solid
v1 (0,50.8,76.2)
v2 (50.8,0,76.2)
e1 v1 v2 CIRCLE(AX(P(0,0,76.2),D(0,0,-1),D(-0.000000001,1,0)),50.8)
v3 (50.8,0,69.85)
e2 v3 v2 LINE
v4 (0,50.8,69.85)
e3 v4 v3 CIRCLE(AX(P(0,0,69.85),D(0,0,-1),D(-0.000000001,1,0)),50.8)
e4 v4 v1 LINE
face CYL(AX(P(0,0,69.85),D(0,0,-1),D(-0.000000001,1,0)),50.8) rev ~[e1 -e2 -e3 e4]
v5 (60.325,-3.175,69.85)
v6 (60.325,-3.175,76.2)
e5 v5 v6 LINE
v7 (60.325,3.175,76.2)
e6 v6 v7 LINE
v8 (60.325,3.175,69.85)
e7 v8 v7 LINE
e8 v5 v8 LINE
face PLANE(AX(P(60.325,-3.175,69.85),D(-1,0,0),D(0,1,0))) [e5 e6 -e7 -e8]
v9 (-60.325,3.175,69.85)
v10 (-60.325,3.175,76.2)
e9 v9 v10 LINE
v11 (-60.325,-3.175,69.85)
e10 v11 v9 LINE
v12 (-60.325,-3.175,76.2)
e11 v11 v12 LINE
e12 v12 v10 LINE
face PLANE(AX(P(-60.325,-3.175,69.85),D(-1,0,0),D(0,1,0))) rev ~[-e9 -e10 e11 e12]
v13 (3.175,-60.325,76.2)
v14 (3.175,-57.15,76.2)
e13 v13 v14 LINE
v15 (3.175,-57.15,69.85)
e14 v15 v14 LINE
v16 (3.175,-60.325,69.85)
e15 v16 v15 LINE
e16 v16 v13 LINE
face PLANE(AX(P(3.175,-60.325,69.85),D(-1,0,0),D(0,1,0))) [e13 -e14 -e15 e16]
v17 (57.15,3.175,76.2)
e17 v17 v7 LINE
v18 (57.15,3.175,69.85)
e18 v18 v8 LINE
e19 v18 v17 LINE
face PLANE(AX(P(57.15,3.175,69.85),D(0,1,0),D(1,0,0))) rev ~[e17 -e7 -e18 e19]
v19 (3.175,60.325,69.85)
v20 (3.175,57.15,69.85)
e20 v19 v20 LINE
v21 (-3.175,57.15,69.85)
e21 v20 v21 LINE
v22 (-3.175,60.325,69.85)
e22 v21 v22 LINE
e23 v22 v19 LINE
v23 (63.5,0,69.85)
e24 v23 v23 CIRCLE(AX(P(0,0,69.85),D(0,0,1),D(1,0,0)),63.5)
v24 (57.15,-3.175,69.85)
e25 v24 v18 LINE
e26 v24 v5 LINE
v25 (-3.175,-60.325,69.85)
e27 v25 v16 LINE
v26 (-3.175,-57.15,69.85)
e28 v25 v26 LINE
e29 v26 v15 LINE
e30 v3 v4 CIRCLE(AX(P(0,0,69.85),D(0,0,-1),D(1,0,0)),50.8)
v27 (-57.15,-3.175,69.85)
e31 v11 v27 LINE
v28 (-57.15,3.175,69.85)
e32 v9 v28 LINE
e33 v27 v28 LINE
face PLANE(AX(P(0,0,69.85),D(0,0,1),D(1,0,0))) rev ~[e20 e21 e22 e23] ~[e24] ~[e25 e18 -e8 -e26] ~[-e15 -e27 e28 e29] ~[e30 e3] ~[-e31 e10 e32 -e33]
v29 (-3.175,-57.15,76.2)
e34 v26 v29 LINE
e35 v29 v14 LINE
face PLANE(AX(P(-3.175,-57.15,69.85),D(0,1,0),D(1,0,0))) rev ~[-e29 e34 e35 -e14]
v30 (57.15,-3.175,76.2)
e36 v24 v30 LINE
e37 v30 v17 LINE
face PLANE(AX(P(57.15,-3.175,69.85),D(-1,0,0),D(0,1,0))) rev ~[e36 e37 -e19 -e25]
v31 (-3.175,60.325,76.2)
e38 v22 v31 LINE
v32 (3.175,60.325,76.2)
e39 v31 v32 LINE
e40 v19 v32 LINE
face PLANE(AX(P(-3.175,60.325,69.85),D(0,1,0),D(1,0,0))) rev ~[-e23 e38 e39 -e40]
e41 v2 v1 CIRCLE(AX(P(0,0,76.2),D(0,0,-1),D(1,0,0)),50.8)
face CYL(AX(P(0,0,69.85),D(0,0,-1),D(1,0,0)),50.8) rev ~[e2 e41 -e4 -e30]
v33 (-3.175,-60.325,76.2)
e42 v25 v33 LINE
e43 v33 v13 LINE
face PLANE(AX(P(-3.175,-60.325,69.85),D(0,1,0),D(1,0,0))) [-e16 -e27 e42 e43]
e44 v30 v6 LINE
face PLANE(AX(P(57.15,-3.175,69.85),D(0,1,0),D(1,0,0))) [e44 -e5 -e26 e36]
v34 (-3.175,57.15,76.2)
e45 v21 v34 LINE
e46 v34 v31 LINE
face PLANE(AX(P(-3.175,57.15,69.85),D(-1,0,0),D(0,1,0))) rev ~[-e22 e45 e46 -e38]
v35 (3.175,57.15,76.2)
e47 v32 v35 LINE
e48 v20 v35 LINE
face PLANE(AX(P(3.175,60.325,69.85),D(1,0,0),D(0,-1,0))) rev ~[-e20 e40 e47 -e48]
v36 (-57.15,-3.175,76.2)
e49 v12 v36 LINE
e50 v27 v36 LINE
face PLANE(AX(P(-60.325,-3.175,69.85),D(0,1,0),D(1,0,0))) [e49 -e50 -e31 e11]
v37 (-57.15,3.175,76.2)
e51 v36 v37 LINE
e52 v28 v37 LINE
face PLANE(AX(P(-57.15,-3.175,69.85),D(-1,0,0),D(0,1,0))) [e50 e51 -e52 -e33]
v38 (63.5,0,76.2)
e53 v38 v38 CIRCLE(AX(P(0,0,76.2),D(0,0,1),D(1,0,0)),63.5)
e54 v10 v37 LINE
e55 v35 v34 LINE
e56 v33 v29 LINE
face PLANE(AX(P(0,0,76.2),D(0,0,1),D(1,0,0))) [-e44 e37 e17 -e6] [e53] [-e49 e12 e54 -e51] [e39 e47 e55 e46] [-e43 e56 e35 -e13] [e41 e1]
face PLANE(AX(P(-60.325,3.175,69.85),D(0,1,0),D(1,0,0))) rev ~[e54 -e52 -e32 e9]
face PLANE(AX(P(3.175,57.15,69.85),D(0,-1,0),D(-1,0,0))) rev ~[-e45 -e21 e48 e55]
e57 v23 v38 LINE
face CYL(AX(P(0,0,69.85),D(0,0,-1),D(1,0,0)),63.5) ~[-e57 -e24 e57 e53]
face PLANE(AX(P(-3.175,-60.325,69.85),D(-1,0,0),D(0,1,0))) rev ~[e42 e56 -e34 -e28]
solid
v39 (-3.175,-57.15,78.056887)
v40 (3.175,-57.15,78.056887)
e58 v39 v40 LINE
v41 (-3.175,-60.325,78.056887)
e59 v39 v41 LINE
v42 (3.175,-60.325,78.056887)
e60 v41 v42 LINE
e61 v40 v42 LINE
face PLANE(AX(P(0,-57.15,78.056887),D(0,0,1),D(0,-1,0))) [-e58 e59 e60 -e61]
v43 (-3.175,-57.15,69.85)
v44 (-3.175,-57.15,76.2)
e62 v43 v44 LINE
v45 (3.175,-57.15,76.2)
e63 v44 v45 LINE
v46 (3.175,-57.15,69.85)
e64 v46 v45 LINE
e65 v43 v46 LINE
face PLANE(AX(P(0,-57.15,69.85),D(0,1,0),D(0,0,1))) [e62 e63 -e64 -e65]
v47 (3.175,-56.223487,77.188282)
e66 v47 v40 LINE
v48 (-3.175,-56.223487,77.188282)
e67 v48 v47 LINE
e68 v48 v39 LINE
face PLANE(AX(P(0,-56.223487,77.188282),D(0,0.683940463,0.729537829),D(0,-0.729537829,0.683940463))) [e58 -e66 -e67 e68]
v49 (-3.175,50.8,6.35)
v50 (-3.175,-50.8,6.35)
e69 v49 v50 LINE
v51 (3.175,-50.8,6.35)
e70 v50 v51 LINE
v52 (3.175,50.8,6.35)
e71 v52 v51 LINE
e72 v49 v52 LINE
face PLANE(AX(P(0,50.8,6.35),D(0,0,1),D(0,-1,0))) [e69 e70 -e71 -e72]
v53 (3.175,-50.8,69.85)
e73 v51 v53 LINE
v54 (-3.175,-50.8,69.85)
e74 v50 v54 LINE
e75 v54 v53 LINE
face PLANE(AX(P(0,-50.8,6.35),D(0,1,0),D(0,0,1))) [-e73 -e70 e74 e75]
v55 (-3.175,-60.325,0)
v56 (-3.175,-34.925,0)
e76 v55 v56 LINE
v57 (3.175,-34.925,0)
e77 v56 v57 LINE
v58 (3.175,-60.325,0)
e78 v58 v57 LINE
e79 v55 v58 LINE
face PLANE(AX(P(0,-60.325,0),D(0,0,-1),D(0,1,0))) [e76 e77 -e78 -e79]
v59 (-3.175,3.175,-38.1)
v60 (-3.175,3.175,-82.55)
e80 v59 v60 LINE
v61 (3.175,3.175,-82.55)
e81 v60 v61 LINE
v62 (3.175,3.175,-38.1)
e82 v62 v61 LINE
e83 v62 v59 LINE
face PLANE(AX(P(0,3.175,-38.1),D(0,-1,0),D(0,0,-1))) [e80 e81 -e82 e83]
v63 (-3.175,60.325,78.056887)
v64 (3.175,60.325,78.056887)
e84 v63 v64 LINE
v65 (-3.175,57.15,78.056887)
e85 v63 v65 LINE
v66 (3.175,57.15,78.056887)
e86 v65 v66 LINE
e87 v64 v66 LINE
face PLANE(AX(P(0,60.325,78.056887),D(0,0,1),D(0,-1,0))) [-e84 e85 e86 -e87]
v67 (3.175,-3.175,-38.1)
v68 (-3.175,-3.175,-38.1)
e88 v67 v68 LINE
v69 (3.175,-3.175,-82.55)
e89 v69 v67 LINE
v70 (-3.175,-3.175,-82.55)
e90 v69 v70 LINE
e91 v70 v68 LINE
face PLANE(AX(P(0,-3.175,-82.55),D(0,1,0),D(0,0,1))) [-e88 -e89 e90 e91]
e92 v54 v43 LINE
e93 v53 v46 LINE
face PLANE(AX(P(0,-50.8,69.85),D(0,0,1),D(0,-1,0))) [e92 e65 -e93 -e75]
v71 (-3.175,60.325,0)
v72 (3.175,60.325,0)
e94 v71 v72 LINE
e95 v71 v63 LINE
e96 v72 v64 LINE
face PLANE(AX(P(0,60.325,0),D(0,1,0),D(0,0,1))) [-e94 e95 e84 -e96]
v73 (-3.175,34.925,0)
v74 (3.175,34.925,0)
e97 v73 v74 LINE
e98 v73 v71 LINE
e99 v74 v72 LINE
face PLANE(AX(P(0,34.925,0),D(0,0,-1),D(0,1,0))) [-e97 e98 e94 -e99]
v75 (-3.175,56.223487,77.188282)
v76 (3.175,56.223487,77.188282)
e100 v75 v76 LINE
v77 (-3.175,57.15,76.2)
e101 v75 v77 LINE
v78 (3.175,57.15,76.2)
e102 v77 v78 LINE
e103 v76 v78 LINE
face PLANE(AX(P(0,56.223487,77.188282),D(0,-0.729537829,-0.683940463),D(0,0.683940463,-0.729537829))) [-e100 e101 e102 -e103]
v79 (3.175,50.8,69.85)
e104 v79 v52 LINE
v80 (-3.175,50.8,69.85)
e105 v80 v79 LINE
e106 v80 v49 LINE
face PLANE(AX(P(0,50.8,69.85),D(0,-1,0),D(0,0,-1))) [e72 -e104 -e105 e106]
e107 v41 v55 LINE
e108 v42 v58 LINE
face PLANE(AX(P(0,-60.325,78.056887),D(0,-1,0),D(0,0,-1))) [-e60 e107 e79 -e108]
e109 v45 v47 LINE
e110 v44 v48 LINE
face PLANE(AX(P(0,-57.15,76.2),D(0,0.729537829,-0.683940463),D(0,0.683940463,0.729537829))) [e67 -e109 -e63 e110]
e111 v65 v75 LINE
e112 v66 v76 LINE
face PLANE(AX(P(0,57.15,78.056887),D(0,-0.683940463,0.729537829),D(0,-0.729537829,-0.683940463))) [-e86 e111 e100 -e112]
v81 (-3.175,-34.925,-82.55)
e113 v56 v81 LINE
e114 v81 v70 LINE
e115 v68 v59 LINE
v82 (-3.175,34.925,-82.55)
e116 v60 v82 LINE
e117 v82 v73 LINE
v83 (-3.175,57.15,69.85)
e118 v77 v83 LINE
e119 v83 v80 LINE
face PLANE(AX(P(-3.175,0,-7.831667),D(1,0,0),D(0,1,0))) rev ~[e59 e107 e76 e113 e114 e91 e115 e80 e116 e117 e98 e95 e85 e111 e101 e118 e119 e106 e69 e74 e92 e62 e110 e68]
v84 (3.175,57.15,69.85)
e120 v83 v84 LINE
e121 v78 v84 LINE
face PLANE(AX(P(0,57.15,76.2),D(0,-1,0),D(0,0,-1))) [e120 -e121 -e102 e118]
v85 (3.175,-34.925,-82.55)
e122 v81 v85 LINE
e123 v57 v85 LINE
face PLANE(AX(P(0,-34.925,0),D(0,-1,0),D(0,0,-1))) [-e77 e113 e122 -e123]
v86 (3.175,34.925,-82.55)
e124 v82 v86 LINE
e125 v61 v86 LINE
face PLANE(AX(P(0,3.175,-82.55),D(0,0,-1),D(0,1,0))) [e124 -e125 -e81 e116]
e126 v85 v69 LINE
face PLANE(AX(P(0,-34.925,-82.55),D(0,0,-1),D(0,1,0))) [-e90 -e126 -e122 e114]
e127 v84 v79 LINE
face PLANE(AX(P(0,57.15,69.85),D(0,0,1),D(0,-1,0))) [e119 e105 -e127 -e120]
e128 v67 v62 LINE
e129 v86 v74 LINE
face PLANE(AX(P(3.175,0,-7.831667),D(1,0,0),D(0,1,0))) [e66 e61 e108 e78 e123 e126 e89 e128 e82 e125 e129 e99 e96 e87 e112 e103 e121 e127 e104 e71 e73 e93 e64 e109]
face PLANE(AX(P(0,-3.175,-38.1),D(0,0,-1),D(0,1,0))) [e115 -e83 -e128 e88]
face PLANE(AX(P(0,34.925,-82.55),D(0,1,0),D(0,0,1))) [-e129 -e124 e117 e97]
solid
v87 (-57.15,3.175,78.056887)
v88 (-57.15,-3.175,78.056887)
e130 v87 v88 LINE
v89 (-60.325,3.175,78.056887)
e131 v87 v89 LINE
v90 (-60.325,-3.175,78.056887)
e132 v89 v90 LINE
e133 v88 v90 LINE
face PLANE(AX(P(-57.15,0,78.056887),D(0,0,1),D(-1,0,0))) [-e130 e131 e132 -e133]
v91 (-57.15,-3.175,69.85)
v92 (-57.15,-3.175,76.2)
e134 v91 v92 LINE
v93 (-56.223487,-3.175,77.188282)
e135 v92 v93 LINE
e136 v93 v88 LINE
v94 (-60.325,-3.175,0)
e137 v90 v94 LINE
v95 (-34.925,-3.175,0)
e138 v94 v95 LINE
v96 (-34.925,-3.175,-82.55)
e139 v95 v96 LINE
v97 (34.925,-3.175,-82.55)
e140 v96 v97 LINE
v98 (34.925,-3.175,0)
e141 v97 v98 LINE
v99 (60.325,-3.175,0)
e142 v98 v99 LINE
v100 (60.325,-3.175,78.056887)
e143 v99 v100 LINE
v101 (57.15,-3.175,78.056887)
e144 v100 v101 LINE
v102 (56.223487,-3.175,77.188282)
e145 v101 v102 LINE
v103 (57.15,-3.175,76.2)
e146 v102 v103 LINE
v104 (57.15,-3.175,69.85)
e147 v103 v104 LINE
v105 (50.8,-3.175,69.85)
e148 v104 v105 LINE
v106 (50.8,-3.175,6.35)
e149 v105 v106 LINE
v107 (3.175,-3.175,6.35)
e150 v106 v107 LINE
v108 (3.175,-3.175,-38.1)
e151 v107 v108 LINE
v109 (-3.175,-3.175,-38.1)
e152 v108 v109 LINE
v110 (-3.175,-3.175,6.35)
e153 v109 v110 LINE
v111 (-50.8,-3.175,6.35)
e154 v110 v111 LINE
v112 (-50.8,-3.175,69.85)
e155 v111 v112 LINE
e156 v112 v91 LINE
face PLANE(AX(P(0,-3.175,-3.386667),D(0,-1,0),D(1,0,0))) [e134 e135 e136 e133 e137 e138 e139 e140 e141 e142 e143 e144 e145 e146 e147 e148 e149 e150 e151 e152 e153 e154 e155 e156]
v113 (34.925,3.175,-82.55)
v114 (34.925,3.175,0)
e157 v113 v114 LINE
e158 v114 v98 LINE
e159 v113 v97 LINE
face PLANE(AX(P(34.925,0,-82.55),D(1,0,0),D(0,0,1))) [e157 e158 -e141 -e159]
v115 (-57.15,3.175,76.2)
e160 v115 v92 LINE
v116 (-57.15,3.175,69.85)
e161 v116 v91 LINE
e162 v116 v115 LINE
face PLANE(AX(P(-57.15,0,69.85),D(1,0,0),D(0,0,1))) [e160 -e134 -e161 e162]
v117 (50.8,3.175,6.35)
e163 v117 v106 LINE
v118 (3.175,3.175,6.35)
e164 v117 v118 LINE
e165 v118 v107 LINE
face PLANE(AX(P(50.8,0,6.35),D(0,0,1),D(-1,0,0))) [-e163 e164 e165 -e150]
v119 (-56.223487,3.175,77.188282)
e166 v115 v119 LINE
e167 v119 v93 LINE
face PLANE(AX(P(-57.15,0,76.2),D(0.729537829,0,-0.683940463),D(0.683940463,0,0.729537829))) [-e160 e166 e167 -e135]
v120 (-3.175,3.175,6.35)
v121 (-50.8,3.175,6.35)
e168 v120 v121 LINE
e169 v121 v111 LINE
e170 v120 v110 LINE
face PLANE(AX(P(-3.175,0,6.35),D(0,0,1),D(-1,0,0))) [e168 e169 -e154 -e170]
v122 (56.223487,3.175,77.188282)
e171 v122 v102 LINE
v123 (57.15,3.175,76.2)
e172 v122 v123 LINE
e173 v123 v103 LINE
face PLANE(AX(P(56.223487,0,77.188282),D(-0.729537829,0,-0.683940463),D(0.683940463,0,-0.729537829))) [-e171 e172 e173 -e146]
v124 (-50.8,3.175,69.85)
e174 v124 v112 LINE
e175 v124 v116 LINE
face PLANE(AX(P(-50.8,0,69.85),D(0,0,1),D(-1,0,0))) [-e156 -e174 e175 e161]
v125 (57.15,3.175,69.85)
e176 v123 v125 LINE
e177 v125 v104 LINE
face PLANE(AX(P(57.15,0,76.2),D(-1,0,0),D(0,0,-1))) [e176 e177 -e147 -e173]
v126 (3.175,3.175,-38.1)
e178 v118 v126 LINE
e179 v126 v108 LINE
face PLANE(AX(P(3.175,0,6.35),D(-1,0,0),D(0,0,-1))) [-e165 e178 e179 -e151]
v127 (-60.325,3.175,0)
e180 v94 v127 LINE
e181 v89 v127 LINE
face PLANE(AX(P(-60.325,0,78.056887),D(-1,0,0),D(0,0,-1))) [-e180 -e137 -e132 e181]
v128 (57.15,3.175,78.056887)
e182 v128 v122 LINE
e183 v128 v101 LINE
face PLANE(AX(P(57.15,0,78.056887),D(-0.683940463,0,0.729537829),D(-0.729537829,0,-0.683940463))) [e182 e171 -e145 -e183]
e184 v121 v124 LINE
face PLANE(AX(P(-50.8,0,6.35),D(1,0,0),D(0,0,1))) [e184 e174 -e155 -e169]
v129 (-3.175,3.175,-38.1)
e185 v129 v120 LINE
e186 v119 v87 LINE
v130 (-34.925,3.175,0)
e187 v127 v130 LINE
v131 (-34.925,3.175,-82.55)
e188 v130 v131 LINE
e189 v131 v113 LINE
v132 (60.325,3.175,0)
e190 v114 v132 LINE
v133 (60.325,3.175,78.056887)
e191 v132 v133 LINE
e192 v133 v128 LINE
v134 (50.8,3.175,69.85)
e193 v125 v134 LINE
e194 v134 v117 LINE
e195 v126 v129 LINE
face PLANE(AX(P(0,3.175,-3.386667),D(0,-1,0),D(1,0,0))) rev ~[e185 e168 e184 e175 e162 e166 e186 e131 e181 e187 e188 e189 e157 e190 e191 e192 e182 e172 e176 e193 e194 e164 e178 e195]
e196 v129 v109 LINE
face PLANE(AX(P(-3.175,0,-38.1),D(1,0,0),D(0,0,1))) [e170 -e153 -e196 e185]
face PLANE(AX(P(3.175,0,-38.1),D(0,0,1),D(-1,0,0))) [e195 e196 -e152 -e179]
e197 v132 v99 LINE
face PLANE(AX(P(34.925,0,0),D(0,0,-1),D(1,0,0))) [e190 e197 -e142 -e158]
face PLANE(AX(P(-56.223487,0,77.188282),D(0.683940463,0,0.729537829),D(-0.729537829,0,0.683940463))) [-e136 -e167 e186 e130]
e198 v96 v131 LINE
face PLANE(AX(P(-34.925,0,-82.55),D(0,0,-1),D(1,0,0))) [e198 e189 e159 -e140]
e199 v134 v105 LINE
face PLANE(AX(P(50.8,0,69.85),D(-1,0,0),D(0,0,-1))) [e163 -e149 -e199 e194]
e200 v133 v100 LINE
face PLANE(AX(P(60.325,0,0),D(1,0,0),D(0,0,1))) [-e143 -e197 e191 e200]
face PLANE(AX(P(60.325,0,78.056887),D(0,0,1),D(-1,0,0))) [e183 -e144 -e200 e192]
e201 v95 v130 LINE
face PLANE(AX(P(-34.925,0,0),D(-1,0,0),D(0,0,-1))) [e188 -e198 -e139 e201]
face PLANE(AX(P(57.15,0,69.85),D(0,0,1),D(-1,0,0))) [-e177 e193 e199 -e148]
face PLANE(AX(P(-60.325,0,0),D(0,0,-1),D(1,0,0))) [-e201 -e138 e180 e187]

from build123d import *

# Parameters (mm, degrees)
F1_DEPTH = 3.175
F3_DEPTH = 3.175
F4_R     = 63.5
F4_W     = 6.35
F4_H     = 3.175
F4_W_2   = 3.175
F4_H_2   = 6.35
F5_DEPTH = 6.35


# Not quite as in the source:
# - a feature names something its author has since deleted; it is built from what else it names


with BuildPart() as f1:
    # F0 (on Front) → F1 (new body, symmetric)
    with BuildSketch(Plane.XZ):
        Polygon((-34.925, -82.55), (0, -82.55), (34.925, -82.55), (34.925, 0), (60.325, 0), (60.325, 69.85), (57.15, 69.85), (50.8, 69.85), (50.8, 6.35), (3.175, 6.35), (3.175, -38.1), (-3.175, -38.1), (-3.175, 6.35), (-50.8, 6.35), (-50.8, 69.85), (-57.15, 69.85), (-60.325, 69.85), (-60.325, 0), (-34.925, 0), align=None)
        Polygon((-60.325, 78.0568867745), (-60.325, 69.85), (-57.15, 69.85), (-57.15, 76.2), (-56.2234869578, 77.1882823867), (-57.15, 78.0568867745), align=None)
        Polygon((57.15, 69.85), (60.325, 69.85), (60.325, 78.0568867745), (57.15, 78.0568867745), (56.2234869578, 77.1882823867), (57.15, 76.2), align=None)
    extrude(amount=F1_DEPTH, both=True)


with BuildPart() as f3:
    # F2 (on Right) → F3 (new body, symmetric)
    with BuildSketch(Plane.YZ):
        Polygon((3.175, -38.1), (3.175, -82.55), (34.925, -82.55), (34.925, 0), (60.325, 0), (60.325, 69.85), (57.15, 69.85), (50.8, 69.85), (50.8, 6.35), (3.175, 6.35), (-3.175, 6.35), (-50.8, 6.35), (-50.8, 69.85), (-57.15, 69.85), (-60.325, 69.85), (-60.325, 0), (-34.925, 0), (-34.925, -82.55), (-3.175, -82.55), (-3.175, -38.1), (0, -38.1), align=None)
        Polygon((57.15, 69.85), (60.325, 69.85), (60.325, 78.0568867745), (57.15, 78.0568867745), (56.2234869578, 77.1882823867), (57.15, 76.2), align=None)
        Polygon((-60.325, 78.0568867745), (-60.325, 69.85), (-57.15, 69.85), (-57.15, 76.2), (-56.2234869578, 77.1882823867), (-57.15, 78.0568867745), align=None)
    extrude(amount=F3_DEPTH, both=True)


with BuildPart() as f5:
    # F4 (on face) → F5 (new body)
    with BuildSketch(Plane.XY.offset(69.85)):
        Circle(F4_R)
        with Locations((0, -58.7375)):
            Rectangle(F4_W, F4_H, mode=Mode.SUBTRACT)
        with Locations((-58.7375, 0)):
            Rectangle(F4_W_2, F4_H_2, mode=Mode.SUBTRACT)
        with BuildLine():
            ThreePointArc((-6.22e-08, 50.8), (35.9210244623, 35.9210245063), (50.8, 0))
            ThreePointArc((50.8, 0), (-35.9210244623, -35.9210245063), (-6.22e-08, 50.8))
        make_face(mode=Mode.SUBTRACT)
        with Locations((58.7375, 0)):
            Rectangle(F4_W_2, F4_H_2, mode=Mode.SUBTRACT)
        Polygon((3.175, 50.8), (-6.22e-08, 50.8), (-3.175, 50.8), (-3.175, 57.15), (-3.175, 60.325), (3.175, 60.325), (3.175, 57.15), align=None, mode=Mode.SUBTRACT)
        Polygon((-3.175, 50.8), (-6.22e-08, 50.8), (3.175, 50.8), (3.175, 57.15), (-3.175, 57.15), align=None)
    extrude(amount=F5_DEPTH)


solid = Compound([f1.part, f3.part, f5.part])
